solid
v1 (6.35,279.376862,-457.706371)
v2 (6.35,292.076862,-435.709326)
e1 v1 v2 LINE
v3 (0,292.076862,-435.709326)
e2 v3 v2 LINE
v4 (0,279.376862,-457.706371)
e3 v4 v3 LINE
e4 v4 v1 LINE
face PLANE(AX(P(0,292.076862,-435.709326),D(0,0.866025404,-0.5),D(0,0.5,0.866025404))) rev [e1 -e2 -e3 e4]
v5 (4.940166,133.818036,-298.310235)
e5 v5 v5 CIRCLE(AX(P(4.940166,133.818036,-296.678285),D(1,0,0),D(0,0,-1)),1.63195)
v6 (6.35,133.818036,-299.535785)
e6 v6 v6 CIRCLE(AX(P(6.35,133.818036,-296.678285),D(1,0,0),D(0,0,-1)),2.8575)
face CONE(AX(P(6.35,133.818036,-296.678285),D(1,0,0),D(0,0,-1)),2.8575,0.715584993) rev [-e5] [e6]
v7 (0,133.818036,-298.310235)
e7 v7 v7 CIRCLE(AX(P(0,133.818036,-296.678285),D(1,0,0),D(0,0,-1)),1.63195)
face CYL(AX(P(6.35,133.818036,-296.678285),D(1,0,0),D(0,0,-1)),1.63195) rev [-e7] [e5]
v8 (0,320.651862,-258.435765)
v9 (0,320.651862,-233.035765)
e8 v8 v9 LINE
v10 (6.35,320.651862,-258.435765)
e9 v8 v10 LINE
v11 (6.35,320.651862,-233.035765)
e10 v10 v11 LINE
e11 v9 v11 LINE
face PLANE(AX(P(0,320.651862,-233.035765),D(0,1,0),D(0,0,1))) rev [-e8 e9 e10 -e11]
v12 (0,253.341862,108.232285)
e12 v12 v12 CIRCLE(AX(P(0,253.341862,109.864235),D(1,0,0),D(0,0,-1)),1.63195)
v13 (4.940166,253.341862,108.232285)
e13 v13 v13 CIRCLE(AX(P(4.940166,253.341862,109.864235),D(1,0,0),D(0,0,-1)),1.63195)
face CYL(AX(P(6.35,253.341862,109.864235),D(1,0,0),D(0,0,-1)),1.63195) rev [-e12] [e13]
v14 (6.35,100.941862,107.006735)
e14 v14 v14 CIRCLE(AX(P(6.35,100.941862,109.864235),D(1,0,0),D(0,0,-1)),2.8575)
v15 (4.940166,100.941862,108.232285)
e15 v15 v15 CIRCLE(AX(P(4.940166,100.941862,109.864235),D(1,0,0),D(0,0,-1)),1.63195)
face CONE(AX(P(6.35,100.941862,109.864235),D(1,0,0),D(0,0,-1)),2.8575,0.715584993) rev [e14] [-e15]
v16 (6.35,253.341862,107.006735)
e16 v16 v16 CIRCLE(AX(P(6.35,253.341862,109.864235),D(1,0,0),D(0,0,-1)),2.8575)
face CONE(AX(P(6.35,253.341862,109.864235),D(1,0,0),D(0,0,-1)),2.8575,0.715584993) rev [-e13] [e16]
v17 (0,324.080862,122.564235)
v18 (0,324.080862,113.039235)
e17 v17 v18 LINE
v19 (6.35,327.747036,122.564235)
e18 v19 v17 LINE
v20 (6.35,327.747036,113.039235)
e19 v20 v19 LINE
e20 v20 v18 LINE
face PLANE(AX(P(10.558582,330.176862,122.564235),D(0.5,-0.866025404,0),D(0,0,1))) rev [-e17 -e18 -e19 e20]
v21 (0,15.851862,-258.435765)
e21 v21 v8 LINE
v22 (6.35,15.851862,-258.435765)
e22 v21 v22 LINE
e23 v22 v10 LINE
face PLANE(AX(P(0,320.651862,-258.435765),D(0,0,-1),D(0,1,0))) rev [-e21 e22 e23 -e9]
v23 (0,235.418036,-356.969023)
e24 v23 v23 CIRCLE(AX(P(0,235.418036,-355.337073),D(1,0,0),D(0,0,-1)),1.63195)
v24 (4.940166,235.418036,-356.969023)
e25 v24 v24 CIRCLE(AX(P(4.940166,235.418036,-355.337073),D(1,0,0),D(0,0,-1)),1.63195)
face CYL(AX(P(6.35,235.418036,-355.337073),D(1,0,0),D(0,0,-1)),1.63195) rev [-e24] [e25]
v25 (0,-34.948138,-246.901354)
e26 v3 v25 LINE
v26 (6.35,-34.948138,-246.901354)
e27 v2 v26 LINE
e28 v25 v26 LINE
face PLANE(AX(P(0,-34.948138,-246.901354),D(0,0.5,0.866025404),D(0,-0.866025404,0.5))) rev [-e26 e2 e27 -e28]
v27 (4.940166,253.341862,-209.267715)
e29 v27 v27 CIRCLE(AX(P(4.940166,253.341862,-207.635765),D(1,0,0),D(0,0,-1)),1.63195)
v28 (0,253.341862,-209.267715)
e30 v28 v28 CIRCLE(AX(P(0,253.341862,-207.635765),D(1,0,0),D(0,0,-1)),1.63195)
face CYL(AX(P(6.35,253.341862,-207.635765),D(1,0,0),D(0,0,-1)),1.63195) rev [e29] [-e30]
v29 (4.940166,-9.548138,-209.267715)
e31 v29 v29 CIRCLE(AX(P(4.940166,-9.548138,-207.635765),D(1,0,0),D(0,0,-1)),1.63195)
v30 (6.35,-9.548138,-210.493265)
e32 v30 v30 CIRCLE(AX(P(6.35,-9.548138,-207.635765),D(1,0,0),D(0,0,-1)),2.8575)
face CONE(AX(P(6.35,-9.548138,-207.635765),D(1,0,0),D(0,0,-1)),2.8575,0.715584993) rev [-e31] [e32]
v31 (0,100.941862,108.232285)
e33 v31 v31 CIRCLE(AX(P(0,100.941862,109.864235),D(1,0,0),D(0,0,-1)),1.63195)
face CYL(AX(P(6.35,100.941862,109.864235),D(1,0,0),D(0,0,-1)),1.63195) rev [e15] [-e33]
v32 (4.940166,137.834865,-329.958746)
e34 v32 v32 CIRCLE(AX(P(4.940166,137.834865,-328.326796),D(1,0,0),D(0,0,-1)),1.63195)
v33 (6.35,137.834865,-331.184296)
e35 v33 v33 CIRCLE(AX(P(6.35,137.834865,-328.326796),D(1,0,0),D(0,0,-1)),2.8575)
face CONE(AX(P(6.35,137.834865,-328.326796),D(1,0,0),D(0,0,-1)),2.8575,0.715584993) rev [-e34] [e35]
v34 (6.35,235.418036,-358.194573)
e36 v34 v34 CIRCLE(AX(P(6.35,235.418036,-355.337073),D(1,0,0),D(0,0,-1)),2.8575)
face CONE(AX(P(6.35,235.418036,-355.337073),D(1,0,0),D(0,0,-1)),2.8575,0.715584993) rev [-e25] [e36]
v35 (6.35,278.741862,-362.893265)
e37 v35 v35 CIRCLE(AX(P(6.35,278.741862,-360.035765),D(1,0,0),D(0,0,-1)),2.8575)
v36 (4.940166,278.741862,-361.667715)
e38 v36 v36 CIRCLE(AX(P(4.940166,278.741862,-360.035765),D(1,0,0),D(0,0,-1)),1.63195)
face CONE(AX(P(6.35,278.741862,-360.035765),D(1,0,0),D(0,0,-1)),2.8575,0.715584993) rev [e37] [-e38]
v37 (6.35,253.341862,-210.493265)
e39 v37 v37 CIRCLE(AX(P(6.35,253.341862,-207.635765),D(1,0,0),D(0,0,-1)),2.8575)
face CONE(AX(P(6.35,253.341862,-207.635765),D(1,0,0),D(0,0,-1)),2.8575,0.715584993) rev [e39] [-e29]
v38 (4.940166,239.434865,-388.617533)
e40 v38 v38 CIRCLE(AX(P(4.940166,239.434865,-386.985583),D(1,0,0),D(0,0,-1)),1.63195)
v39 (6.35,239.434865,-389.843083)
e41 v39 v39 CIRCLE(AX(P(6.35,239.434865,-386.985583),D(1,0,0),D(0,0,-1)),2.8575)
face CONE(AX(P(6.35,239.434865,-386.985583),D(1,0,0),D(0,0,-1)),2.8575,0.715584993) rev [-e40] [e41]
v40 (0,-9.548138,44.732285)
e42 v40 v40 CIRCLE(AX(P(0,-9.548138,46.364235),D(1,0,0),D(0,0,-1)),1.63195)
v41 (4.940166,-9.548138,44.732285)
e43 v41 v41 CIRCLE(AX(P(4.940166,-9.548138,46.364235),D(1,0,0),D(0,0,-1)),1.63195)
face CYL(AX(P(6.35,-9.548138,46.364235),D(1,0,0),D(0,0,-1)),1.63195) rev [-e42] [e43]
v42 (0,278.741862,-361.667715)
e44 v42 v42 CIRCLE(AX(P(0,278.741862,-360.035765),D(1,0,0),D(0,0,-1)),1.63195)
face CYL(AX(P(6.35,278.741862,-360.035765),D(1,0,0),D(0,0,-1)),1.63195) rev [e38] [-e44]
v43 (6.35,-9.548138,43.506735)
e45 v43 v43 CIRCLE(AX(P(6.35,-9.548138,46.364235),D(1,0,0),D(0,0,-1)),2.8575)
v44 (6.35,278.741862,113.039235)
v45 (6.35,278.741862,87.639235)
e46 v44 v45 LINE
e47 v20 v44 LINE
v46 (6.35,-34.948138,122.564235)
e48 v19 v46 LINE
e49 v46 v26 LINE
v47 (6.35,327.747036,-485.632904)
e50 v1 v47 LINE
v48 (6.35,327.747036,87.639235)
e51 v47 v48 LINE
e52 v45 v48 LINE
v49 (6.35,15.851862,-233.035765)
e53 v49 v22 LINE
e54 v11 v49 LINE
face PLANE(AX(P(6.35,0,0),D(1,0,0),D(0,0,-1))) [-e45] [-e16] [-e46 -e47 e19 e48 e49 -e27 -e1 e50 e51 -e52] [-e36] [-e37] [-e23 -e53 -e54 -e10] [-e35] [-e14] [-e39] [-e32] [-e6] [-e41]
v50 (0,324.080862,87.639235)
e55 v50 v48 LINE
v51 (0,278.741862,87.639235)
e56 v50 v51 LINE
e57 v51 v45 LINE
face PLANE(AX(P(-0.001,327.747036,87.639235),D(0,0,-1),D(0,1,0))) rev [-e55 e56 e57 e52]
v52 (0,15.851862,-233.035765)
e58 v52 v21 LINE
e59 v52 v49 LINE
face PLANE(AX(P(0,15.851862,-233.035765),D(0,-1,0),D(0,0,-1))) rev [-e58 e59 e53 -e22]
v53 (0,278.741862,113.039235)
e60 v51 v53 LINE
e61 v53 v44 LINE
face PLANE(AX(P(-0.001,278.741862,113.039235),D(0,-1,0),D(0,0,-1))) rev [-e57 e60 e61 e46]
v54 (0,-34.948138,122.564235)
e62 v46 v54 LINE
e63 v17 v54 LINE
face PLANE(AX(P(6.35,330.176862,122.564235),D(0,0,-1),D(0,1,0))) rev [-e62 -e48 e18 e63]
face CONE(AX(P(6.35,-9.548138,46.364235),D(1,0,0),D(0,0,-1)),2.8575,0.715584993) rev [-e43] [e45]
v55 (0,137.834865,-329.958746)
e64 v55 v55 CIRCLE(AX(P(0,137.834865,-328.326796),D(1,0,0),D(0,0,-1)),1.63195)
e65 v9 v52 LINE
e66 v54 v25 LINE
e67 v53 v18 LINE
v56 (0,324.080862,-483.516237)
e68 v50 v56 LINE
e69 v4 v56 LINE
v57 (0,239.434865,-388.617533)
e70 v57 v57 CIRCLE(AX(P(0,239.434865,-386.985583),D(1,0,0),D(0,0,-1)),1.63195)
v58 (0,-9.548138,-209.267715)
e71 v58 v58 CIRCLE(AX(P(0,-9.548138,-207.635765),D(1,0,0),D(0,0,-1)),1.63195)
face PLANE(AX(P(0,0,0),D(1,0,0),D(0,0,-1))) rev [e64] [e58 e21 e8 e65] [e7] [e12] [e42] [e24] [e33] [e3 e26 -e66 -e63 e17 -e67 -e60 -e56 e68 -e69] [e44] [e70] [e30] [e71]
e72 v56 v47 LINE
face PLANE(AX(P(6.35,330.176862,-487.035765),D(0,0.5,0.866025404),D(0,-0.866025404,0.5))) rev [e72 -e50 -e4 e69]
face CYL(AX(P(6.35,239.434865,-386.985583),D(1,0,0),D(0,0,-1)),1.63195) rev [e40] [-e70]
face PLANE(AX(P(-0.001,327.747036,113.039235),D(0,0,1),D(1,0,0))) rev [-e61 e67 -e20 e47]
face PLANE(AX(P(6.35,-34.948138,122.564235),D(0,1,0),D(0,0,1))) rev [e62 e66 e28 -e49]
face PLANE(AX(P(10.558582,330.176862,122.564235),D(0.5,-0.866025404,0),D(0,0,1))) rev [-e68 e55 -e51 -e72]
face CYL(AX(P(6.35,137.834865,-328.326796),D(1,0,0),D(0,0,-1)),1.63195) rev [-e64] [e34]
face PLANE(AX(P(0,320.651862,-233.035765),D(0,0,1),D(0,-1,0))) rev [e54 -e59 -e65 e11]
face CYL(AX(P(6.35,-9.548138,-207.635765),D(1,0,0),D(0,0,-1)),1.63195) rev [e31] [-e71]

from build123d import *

# Parameters (mm, degrees)
BOSS_EXTRUDE1_DEPTH                            = 6.35
SKETCH2_W                                      = 25.4
SKETCH2_H                                      = 304.8
CUT_EXTRUDE1_DEPTH                             = 589.439392722
CUT_EXTRUDE2_DEPTH                             = 589.439392722
CSK_FOR_4_FLAT_HEAD_MACHINE_SCREW3_D           = 3.2639
CSK_FOR_4_FLAT_HEAD_MACHINE_SCREW3_CSINK_D     = 5.715
CSK_FOR_4_FLAT_HEAD_MACHINE_SCREW3_CSINK_ANGLE = 82
CSK_FOR_4_FLAT_HEAD_MACHINE_SCREW2_D           = 3.2639
CSK_FOR_4_FLAT_HEAD_MACHINE_SCREW2_CSINK_D     = 5.715
CSK_FOR_4_FLAT_HEAD_MACHINE_SCREW2_CSINK_ANGLE = 82
CSK_FOR_4_FLAT_HEAD_MACHINE_SCREW1_D           = 3.2639
CSK_FOR_4_FLAT_HEAD_MACHINE_SCREW1_CSINK_D     = 5.715
CSK_FOR_4_FLAT_HEAD_MACHINE_SCREW1_CSINK_ANGLE = 82
CSK_FOR_4_FLAT_HEAD_MACHINE_SCREW4_D           = 3.2639
CSK_FOR_4_FLAT_HEAD_MACHINE_SCREW4_CSINK_D     = 5.715
CSK_FOR_4_FLAT_HEAD_MACHINE_SCREW4_CSINK_ANGLE = 82
CHAMFER1_SIZE                                  = 10.558581723
CHAMFER1_SIZE_2                                = 6.096
CUT_EXTRUDE3_REACH                             = 587.916
SKETCH7_W                                      = 25.4
SKETCH7_H                                      = 49.005174209


with BuildPart() as part:
    # Sketch1 → Boss-Extrude1 (new body)
    with BuildSketch(Plane(origin=(0, 0, 0), x_dir=(0, 0, -1), z_dir=(1, 0, 0))):
        Polygon((487.035764647, 330.176862244), (276.230747609, -34.948137756), (-122.564235353, -34.948137756), (-122.564235353, 330.176862244), align=None)
    extrude(amount=BOSS_EXTRUDE1_DEPTH)

    # Sketch2 → Cut-Extrude1 (cut, through all)
    with BuildSketch(Plane(origin=(6.35, 0, 0), x_dir=(0, 0, -1), z_dir=(1, 0, 0))):
        with Locations((245.735764647, 168.251862244)):
            Rectangle(SKETCH2_W, SKETCH2_H)
    extrude(amount=-CUT_EXTRUDE1_DEPTH, mode=Mode.SUBTRACT)

    # Sketch3 → Cut-Extrude2 (cut, through all)
    with BuildSketch(Plane(origin=(6.35, 0, 0), x_dir=(0, 0, -1), z_dir=(1, 0, 0))):
        Polygon((457.706370973, 279.376862244), (276.230747609, -34.948137756), (246.901353935, -34.948137756), (435.709325716, 292.076862244), align=None)
    extrude(amount=-CUT_EXTRUDE2_DEPTH, mode=Mode.SUBTRACT)

    # CSK for #4 Flat Head Machine Screw3 (through all)
    with Locations(Plane(origin=(6.35, 253.341862244, 109.864235353), x_dir=(0, 0, 1), z_dir=(1, 0, 0))):
        with Locations((0, 0), (-317.5, 0), (-469.9, -25.4)):
            CounterSinkHole(CSK_FOR_4_FLAT_HEAD_MACHINE_SCREW3_D / 2, CSK_FOR_4_FLAT_HEAD_MACHINE_SCREW3_CSINK_D / 2, counter_sink_angle=CSK_FOR_4_FLAT_HEAD_MACHINE_SCREW3_CSINK_ANGLE)

    # CSK for #4 Flat Head Machine Screw2 (through all)
    with Locations(Plane(origin=(6.35, 100.941862244, 109.864235353), x_dir=(0, 0, 1), z_dir=(1, 0, 0))):
        with Locations((0, 0)):
            CounterSinkHole(CSK_FOR_4_FLAT_HEAD_MACHINE_SCREW2_D / 2, CSK_FOR_4_FLAT_HEAD_MACHINE_SCREW2_CSINK_D / 2, counter_sink_angle=CSK_FOR_4_FLAT_HEAD_MACHINE_SCREW2_CSINK_ANGLE)

    # CSK for #4 Flat Head Machine Screw1 (through all)
    with Locations(Plane(origin=(6.35, -9.548137756, 46.364235353), x_dir=(0, 0, 1), z_dir=(1, 0, 0))):
        with Locations((0, 0), (-254, 0)):
            CounterSinkHole(CSK_FOR_4_FLAT_HEAD_MACHINE_SCREW1_D / 2, CSK_FOR_4_FLAT_HEAD_MACHINE_SCREW1_CSINK_D / 2, counter_sink_angle=CSK_FOR_4_FLAT_HEAD_MACHINE_SCREW1_CSINK_ANGLE)

    # CSK for #4 Flat Head Machine Screw4 (through all)
    with Locations(Plane(origin=(6.35, 235.418036453, -355.337072673), x_dir=(0, 0, 1), z_dir=(1, 0, 0))):
        with Locations((0, 0), (-31.648510504, -4.016828178), (58.65878735, 101.6), (27.010276846, 97.583171822)):
            CounterSinkHole(CSK_FOR_4_FLAT_HEAD_MACHINE_SCREW4_D / 2, CSK_FOR_4_FLAT_HEAD_MACHINE_SCREW4_CSINK_D / 2, counter_sink_angle=CSK_FOR_4_FLAT_HEAD_MACHINE_SCREW4_CSINK_ANGLE)

    # Chamfer1
    # the kernel refuses this chamfer: 10.558581723, 6.096 mm, written as the material it takes off along each edge
    with BuildSketch(Plane(origin=(0, 330.176862244, 149.880191717), x_dir=(0.9998132206222078, 0.01932676561270281, 0), z_dir=(0, 0, -1))) as chamfer1_piece_1:
        Polygon((CHAMFER1_SIZE * 0.999813220617, CHAMFER1_SIZE * 0.0193267656126), (-CHAMFER1_SIZE_2 * 0.0193267656127, CHAMFER1_SIZE_2 * 0.999813220622), (0, 0), align=None)
    extrude(amount=664.231912729, mode=Mode.SUBTRACT)

    # Sketch7 → Cut-Extrude3 (cut, up to next)
    with BuildSketch(Plane(origin=(6.35, 0, 0), x_dir=(0, 0, -1), z_dir=(1, 0, 0)), mode=Mode.PRIVATE) as cut_extrude3_sk1:
        with Locations((-100.339235353, 303.244449348)):
            Rectangle(SKETCH7_W, SKETCH7_H)
    cut_extrude3_tool1 = extrude(cut_extrude3_sk1.sketch, amount=-CUT_EXTRUDE3_REACH, mode=Mode.PRIVATE) & part.part
    add(cut_extrude3_tool1.solids().sort_by_distance((6.35, 303.244449, 100.339235))[0], mode=Mode.SUBTRACT)


solid = part.part
